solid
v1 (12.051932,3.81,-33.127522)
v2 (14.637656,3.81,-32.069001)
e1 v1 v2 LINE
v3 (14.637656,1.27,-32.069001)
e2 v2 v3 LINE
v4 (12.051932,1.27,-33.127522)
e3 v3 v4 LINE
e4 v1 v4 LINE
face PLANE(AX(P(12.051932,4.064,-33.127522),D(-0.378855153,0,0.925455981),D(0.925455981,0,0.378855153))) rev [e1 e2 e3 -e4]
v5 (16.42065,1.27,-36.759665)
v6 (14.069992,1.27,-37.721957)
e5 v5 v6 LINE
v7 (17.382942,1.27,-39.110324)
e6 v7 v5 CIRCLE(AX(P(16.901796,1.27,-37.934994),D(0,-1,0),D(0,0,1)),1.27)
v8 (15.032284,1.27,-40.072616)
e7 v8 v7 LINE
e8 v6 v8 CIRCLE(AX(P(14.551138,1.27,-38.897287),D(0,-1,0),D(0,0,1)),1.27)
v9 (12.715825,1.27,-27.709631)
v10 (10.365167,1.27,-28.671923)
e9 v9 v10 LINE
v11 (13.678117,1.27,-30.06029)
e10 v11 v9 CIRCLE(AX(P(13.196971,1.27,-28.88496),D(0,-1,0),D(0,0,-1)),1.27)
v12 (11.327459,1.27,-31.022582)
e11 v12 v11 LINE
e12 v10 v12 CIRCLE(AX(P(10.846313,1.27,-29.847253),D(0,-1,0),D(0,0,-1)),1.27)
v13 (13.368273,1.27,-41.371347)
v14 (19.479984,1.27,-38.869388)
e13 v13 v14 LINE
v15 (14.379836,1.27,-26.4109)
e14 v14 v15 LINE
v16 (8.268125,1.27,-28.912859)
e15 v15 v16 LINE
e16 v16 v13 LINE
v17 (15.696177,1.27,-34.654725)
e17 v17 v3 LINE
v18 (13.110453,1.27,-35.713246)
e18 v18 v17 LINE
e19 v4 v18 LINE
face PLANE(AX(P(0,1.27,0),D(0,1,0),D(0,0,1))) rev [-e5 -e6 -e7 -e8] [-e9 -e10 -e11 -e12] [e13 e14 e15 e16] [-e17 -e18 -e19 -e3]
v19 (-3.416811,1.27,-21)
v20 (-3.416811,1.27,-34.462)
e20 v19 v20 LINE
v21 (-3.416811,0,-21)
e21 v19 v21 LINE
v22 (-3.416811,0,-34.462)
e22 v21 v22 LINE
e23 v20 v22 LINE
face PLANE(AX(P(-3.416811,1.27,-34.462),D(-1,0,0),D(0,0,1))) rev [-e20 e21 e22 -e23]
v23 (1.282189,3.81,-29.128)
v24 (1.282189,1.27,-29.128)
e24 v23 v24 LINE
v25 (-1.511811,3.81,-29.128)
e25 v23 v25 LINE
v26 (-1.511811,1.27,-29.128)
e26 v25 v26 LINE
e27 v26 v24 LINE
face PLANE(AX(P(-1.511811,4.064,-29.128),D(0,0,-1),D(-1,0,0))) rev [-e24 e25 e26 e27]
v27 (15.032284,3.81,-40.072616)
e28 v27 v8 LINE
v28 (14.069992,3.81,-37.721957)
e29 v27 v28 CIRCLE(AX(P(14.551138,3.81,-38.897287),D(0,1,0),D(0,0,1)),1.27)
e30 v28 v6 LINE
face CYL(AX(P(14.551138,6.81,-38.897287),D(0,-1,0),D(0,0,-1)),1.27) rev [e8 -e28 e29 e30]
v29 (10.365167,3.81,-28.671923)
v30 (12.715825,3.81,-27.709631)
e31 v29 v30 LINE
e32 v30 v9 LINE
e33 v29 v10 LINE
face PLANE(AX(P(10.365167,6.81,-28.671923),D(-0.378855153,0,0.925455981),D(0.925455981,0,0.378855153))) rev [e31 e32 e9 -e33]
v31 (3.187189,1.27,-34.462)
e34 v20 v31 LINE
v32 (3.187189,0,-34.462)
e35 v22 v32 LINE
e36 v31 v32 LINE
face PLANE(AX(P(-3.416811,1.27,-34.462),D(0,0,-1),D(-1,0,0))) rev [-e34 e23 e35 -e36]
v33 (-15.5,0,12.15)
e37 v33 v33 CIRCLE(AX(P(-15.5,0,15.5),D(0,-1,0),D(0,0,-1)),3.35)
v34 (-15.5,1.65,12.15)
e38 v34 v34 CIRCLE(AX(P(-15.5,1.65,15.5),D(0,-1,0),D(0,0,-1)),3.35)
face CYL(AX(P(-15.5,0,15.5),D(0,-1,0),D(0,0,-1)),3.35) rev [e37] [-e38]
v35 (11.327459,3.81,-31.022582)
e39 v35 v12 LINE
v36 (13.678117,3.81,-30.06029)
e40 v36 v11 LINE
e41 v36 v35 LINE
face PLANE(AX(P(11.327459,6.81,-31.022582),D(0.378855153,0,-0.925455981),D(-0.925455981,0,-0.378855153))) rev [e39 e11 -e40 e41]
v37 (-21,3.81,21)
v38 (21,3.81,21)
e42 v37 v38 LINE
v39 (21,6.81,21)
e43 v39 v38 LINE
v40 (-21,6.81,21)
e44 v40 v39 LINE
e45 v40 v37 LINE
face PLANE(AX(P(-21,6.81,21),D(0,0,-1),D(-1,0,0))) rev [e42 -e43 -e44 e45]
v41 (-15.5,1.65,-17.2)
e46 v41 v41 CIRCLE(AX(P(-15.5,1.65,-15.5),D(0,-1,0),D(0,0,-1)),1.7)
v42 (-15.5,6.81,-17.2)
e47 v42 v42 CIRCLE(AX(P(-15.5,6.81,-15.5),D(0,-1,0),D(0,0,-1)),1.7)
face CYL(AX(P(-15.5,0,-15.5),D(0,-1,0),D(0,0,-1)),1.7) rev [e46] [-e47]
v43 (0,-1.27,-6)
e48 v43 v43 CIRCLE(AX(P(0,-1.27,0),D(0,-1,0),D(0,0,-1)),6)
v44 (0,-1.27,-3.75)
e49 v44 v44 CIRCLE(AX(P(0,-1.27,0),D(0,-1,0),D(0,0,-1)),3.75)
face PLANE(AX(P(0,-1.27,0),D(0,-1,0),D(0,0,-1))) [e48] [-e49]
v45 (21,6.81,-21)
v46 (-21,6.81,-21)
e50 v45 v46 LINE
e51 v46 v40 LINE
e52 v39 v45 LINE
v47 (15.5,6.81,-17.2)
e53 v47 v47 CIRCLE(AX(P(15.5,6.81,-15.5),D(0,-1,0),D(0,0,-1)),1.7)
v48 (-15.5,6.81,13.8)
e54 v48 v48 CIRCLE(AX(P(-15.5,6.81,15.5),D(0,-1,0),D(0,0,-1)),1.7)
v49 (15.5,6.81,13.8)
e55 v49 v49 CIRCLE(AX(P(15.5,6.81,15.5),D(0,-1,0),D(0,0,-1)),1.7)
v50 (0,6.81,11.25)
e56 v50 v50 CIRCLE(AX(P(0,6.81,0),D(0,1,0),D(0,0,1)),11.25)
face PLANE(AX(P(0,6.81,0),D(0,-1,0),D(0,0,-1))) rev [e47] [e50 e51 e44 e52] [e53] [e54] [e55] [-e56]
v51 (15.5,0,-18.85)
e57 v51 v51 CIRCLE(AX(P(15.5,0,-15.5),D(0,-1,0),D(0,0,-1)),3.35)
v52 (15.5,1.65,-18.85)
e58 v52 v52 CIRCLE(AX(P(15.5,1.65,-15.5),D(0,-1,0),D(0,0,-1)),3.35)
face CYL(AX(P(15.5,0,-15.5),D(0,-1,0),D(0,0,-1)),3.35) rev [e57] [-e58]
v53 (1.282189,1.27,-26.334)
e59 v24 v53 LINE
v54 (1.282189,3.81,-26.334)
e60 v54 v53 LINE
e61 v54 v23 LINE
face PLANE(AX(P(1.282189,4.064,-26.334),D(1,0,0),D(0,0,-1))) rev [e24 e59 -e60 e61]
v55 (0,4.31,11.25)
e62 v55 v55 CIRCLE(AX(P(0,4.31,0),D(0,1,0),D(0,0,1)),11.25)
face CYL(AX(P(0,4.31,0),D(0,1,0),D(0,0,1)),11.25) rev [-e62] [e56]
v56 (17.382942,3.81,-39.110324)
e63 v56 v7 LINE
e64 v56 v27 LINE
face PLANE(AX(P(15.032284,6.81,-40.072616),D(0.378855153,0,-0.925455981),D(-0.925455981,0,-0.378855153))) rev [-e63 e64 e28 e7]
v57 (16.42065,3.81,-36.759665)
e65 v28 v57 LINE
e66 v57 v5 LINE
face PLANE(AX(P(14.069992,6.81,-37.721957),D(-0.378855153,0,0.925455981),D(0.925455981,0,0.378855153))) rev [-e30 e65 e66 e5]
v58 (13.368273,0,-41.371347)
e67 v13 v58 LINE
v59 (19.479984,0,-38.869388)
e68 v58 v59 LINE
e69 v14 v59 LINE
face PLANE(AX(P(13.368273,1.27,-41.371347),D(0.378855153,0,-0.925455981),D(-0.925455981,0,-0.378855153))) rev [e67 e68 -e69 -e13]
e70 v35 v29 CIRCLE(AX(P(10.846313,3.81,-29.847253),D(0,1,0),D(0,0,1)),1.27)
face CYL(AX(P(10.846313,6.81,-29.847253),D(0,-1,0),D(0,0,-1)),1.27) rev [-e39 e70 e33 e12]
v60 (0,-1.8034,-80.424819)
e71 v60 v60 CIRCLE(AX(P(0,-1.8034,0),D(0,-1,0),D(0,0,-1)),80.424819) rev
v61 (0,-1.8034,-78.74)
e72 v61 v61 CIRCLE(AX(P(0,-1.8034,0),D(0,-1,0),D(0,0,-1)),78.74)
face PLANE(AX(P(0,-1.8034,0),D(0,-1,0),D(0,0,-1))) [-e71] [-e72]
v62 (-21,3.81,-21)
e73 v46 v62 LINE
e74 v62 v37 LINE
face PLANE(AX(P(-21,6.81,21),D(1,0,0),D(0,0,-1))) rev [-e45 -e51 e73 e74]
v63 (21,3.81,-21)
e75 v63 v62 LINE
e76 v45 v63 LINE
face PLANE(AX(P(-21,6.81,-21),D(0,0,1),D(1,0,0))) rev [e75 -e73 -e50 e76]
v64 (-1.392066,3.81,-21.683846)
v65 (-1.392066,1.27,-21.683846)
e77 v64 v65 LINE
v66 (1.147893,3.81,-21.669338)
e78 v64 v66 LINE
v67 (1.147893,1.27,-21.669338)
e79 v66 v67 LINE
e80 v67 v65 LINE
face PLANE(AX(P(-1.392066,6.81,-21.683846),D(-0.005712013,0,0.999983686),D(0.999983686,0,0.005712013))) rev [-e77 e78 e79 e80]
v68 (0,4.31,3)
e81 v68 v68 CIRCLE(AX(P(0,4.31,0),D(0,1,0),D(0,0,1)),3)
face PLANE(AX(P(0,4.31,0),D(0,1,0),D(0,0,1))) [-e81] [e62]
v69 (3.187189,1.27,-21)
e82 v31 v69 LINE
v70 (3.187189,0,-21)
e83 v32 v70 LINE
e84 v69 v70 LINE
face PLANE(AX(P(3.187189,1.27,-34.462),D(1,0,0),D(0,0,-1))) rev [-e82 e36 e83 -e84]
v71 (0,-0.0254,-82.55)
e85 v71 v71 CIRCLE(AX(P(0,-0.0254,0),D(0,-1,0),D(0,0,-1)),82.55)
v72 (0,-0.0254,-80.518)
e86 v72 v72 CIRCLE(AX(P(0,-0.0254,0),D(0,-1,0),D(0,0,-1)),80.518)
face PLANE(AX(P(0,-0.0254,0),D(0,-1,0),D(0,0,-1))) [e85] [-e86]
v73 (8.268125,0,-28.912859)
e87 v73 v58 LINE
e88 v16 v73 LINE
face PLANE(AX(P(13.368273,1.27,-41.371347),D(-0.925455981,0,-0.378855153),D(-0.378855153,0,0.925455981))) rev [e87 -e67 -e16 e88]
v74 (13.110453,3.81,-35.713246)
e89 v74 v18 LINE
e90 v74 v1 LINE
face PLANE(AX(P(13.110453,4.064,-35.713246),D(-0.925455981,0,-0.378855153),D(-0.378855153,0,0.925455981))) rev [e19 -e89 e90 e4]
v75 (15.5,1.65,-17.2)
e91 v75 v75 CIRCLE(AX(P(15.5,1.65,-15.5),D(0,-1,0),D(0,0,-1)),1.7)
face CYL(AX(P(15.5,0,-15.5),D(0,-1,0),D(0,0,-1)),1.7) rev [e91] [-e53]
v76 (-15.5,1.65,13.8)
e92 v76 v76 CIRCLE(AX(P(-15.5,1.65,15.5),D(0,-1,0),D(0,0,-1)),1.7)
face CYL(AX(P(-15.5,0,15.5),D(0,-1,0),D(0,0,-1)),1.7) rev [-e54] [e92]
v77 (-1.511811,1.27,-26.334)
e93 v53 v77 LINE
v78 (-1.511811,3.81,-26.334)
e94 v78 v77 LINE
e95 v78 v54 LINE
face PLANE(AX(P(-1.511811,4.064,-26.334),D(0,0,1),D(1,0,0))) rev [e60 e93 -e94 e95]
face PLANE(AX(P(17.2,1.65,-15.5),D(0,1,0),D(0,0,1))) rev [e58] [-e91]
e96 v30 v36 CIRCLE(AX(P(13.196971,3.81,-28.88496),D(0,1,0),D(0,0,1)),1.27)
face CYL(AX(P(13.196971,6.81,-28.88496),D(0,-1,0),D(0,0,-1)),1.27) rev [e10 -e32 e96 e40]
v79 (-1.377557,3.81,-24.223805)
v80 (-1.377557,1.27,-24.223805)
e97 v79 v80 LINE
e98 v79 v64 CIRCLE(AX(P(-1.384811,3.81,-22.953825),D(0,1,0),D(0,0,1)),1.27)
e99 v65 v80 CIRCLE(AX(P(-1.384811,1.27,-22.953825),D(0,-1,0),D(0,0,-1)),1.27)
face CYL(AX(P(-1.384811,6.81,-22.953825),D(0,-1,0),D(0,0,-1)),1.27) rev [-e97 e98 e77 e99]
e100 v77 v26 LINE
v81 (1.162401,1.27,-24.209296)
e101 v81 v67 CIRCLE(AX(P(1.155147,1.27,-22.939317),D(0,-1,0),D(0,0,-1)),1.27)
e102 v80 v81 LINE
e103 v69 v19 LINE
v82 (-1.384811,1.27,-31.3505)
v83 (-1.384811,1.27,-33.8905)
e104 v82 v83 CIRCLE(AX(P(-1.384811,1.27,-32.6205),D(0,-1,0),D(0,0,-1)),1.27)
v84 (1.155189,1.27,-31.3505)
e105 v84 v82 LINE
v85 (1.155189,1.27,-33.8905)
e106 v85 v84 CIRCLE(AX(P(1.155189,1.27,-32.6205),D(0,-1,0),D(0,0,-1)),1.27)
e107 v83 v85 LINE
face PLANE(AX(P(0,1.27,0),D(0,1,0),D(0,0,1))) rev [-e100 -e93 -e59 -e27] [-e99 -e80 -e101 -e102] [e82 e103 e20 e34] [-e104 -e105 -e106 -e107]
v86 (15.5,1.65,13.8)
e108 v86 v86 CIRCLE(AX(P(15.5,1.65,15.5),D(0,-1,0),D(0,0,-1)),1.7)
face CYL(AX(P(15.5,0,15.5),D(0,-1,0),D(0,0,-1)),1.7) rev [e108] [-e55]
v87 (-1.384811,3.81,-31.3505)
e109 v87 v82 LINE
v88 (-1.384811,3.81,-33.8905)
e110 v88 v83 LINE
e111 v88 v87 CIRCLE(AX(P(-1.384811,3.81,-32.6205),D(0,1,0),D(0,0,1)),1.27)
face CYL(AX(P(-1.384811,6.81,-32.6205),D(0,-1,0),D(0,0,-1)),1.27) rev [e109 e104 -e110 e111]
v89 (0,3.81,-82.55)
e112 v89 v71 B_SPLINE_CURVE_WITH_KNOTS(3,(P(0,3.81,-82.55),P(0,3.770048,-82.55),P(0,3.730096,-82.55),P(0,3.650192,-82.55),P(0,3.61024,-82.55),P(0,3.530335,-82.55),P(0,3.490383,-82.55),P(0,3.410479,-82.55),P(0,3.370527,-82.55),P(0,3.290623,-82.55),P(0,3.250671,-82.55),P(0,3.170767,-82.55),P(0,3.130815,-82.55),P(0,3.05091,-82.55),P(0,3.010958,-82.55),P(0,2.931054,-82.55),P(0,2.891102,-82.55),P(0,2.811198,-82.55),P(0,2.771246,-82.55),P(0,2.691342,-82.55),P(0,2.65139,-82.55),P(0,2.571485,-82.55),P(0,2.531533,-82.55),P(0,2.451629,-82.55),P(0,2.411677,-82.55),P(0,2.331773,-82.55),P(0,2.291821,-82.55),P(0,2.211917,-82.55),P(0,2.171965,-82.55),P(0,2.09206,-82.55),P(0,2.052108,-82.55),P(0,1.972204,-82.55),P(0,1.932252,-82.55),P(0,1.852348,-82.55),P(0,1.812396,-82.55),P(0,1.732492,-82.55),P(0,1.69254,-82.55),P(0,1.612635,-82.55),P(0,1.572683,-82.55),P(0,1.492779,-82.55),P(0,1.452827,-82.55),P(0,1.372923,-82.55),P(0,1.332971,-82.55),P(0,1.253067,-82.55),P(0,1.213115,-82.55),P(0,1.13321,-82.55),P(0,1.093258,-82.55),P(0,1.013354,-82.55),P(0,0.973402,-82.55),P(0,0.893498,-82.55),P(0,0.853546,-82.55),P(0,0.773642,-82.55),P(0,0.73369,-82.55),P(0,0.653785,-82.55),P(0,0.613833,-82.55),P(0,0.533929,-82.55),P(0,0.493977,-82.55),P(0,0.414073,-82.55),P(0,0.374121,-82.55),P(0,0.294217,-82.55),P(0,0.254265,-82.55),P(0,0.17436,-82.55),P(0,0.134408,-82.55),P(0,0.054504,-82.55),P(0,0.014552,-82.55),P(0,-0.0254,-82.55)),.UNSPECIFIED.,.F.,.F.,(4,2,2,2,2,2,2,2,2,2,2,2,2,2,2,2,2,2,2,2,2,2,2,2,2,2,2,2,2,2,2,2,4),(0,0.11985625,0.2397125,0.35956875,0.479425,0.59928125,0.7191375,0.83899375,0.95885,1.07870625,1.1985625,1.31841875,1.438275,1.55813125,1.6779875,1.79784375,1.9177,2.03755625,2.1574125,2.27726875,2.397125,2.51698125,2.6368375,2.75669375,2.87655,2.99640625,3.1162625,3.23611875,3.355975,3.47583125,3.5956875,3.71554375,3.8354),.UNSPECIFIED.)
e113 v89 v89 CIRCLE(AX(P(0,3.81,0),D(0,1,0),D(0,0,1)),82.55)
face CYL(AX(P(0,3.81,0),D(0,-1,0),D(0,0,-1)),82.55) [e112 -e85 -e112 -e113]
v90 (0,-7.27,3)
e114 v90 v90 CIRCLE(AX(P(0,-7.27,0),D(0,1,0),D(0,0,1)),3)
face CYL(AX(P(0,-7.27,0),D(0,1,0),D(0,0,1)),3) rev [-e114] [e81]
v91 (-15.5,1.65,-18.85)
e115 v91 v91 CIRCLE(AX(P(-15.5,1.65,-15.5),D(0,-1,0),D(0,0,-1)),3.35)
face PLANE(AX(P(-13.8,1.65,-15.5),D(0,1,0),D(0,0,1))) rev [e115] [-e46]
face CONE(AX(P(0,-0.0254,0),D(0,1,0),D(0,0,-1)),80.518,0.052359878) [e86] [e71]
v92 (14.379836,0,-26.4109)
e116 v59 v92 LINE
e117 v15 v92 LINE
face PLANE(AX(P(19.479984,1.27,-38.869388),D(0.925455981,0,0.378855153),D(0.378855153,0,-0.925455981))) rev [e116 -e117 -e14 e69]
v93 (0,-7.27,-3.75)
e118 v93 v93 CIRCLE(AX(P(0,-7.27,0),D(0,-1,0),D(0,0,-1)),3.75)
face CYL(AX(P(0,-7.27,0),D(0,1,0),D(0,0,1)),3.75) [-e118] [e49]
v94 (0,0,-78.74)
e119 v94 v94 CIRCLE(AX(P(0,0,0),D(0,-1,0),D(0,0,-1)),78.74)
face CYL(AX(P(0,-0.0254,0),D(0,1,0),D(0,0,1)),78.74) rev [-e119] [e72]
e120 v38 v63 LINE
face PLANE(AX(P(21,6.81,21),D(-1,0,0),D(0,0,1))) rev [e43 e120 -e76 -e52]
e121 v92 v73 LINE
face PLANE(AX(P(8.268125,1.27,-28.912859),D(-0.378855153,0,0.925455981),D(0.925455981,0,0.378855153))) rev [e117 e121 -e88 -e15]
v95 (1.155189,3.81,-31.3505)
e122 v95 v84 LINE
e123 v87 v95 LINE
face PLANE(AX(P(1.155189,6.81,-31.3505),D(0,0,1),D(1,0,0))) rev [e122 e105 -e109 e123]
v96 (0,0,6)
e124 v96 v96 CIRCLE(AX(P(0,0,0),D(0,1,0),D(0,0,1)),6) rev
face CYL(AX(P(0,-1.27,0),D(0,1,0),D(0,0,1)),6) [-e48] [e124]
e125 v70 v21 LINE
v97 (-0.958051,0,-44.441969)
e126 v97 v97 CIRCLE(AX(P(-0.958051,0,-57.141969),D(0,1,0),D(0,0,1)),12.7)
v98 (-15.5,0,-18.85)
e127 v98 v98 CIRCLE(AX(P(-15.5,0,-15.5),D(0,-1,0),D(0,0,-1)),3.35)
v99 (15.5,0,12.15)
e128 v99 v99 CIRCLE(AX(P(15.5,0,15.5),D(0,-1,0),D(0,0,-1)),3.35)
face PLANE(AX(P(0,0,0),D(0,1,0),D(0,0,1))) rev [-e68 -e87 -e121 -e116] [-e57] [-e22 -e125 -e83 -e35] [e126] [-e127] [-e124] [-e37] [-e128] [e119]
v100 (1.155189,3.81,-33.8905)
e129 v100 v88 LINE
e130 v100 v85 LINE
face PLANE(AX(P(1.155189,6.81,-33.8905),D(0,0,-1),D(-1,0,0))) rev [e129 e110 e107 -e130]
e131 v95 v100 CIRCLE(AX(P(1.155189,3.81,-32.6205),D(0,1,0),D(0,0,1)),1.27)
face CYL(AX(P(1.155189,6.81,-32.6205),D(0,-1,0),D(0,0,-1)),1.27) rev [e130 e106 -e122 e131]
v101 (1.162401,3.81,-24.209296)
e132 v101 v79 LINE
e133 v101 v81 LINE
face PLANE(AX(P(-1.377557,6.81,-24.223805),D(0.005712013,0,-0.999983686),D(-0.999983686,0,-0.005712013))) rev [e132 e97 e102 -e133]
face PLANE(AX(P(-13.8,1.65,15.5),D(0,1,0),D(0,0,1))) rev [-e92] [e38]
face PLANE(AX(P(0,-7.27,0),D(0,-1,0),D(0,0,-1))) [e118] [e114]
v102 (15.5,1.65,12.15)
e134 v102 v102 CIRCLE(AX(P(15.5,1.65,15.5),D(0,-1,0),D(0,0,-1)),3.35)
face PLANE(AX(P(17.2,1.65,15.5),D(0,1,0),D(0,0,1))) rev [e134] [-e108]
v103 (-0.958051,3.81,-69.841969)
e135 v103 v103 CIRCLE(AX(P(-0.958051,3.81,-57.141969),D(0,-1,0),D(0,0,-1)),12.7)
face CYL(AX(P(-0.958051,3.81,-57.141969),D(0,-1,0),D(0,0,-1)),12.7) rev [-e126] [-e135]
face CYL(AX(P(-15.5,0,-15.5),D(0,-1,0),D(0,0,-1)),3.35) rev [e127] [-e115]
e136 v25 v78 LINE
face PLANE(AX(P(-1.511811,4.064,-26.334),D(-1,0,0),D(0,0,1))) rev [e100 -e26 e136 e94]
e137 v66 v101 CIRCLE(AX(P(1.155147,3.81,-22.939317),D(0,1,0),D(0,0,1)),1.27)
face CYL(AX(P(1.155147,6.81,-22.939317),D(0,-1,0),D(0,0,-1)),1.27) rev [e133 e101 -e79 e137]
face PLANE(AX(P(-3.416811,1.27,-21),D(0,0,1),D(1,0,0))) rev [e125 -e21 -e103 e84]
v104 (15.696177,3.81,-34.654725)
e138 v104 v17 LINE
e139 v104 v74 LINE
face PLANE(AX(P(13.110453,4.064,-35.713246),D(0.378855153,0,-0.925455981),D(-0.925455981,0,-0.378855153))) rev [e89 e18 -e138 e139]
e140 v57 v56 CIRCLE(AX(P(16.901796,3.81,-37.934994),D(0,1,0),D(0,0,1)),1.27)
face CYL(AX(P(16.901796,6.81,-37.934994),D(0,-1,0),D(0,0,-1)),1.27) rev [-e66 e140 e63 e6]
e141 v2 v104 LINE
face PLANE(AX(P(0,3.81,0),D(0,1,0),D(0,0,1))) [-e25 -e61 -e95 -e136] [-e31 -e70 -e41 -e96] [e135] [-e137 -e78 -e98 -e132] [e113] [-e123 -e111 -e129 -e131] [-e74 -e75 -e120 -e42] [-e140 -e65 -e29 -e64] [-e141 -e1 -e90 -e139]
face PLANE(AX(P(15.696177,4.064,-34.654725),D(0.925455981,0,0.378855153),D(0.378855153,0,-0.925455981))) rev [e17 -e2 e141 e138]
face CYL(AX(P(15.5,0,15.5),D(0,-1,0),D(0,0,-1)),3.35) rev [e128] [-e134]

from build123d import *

# Parameters (mm, degrees)
SKETCH1_R                       = 82.55
BOSS_EXTRUDE1_DEPTH             = 3.81
HOLE1_OUTLINE_R                 = 12.7
HOLE1_DEPTH                     = 3.81
BOSS_EXTRUDE2_START             = 0.0254
SKETCH3_R                       = 82.55
SKETCH3_R_2                     = 78.74
BOSS_EXTRUDE2_DEPTH             = 0.0254
SKETCH4_R                       = 6
BOSS_EXTRUDE3_DEPTH             = 1.27
SKETCH5_R                       = 3.75
BOSS_EXTRUDE4_DEPTH             = 6
SKETCH7_W                       = 42
SKETCH7_H                       = 42
BOSS_EXTRUDE5_DEPTH             = 3
SKETCH8_R                       = 11.25
CUT_EXTRUDE2_DEPTH              = 2.5
CUT_EXTRUDE1_DEPTH              = 118.267947027
CUT_EXTRUDE1_DEPTH_BACK         = 118.267947027
SKETCH6_R                       = 3
CBORE_FOR_M3_SBHCS1_D           = 3.4
CBORE_FOR_M3_SBHCS1_CBORE_D     = 6.7
CBORE_FOR_M3_SBHCS1_CBORE_DEPTH = 1.65
SKETCH12_W                      = 6.604
SKETCH12_H                      = 13.462
CUT_EXTRUDE3_DEPTH              = 1.27
SKETCH13_W                      = 2.794
SKETCH13_H                      = 2.794
CUT_EXTRUDE4_DEPTH              = 2.794
CUT_EXTRUDE5_DEPTH              = 118.05527156


# Read off the part's stored shape, not the designer's step: Hole1, Lip1
with BuildPart() as part:
    # Sketch1 → Boss-Extrude1 (new body)
    with BuildSketch(Plane(origin=(0, 0, 0), x_dir=(1, 0, 0), z_dir=(0, 1, 0))):
        with Locations(Location((0, 0, 0), (0, 0, 90))):
            Circle(SKETCH1_R)
    extrude(amount=BOSS_EXTRUDE1_DEPTH)

    # Hole1 outline → Hole1 (cut)
    with BuildSketch(Plane(origin=(0, 0, 0), x_dir=(1, 0, 0), z_dir=(0, 1, 0))):
        with Locations((-0.958051057, 57.141969149)):
            Circle(HOLE1_OUTLINE_R)
    extrude(amount=HOLE1_DEPTH, mode=Mode.SUBTRACT)

    # Sketch3 → Boss-Extrude2 (add)
    with BuildSketch(Plane.XZ.offset(BOSS_EXTRUDE2_START)):
        with Locations(Location((0, 0, 0), (0, 0, 270))):
            Circle(SKETCH3_R)
        with Locations(Location((0, 0, 0), (0, 0, 270))):
            Circle(SKETCH3_R_2, mode=Mode.SUBTRACT)
    extrude(amount=-BOSS_EXTRUDE2_DEPTH)

    # Lip1 outline → Lip1 (revolve)
    with BuildSketch(Plane.XY):
        Polygon((78.74, -0.0254), (78.74, -1.8034), (80.424818968, -1.8034), (80.518, -0.0254), align=None)
    revolve(axis=Axis((0, 0, 0), (0, 1, 0)))

    # Sketch4 → Boss-Extrude3 (add)
    with BuildSketch(Plane.XZ):
        with Locations(Location((0, 0, 0), (0, 0, 90))):
            Circle(SKETCH4_R)
    extrude(amount=BOSS_EXTRUDE3_DEPTH)

    # Sketch5 → Boss-Extrude4 (add)
    with BuildSketch(Plane.XZ.offset(1.27)):
        with Locations(Location((0, 0, 0), (0, 0, 270))):
            Circle(SKETCH5_R)
    extrude(amount=BOSS_EXTRUDE4_DEPTH)

    # Sketch7 → Boss-Extrude5 (add)
    with BuildSketch(Plane(origin=(0, 3.81, 0), x_dir=(1, 0, 0), z_dir=(0, 1, 0))):
        Rectangle(SKETCH7_W, SKETCH7_H)
    extrude(amount=BOSS_EXTRUDE5_DEPTH)

    # Sketch8 → Cut-Extrude2 (cut)
    with BuildSketch(Plane(origin=(0, 6.81, 0), x_dir=(1, 0, 0), z_dir=(0, 1, 0))):
        with Locations(Location((0, 0, 0), (0, 0, 270))):
            Circle(SKETCH8_R)
    extrude(amount=-CUT_EXTRUDE2_DEPTH, mode=Mode.SUBTRACT)

    # Sketch6 → Cut-Extrude1 (cut, two sides: drawn at the far end of the back side and taken through both)
    with BuildSketch(Plane(origin=(0, 3.81, 0), x_dir=(1, 0, 0), z_dir=(0, 1, 0)).offset(-CUT_EXTRUDE1_DEPTH_BACK)):
        with Locations(Location((0, 0, 0), (0, 0, 270))):
            Circle(SKETCH6_R)
    extrude(amount=CUT_EXTRUDE1_DEPTH + CUT_EXTRUDE1_DEPTH_BACK, mode=Mode.SUBTRACT)

    # CBORE for M3 SBHCS1 (through all)
    with Locations(Plane(origin=(0, 0, 0), x_dir=(-1, 0, 0), z_dir=(0, -1, 0))):
        with Locations((-15.5, 15.5), (-15.5, -15.5), (15.5, -15.5), (15.5, 15.5)):
            CounterBoreHole(CBORE_FOR_M3_SBHCS1_D / 2, CBORE_FOR_M3_SBHCS1_CBORE_D / 2, CBORE_FOR_M3_SBHCS1_CBORE_DEPTH)

    # Sketch12 → Cut-Extrude3 (cut)
    with BuildSketch(Plane.XZ):
        with Locations((-0.114811482, -27.731)):
            Rectangle(SKETCH12_W, SKETCH12_H)
        Polygon((13.368272935, -41.371347413), (19.479984235, -38.869387984), (14.379836168, -26.410899564), (8.268124867, -28.912858993), align=None)
    extrude(amount=-CUT_EXTRUDE3_DEPTH, mode=Mode.SUBTRACT)

    # Sketch13 → Cut-Extrude4 (cut)
    with BuildSketch(Plane.XZ.offset(-1.27)):
        with Locations((-0.114811482, -27.731)):
            Rectangle(SKETCH13_W, SKETCH13_H)
        Polygon((13.110453194, -35.713246143), (12.051931897, -33.127522131), (14.637655908, -32.069000834), (15.696177205, -34.654724846), align=None)
    extrude(amount=-CUT_EXTRUDE4_DEPTH, mode=Mode.SUBTRACT)

    # Sketch14 → Cut-Extrude5 (cut, through all)
    with BuildSketch(Plane.XZ.offset(-1.27)):
        with BuildLine():
            Line((1.155188518, -33.8905), (-1.384811482, -33.8905))
            ThreePointArc((-1.384811482, -33.8905), (-2.654811482, -32.6205), (-1.384811482, -31.3505))
            Line((-1.384811482, -31.3505), (1.155188518, -31.3505))
            ThreePointArc((1.155188518, -31.3505), (2.425188518, -32.6205), (1.155188518, -33.8905))
        make_face()
        with BuildLine():
            Line((-1.392065738, -21.683846113), (1.147892825, -21.669337601))
            ThreePointArc((1.147892825, -21.669337601), (2.425126363, -22.932062627), (1.162401338, -24.209296164))
            Line((1.162401338, -24.209296164), (-1.377557226, -24.223804677))
            ThreePointArc((-1.377557226, -24.223804677), (-2.654790763, -22.961079651), (-1.392065738, -21.683846113))
        make_face()
        with BuildLine():
            Line((10.365167141, -28.671923416), (12.715825333, -27.709631328))
            ThreePointArc((12.715825333, -27.709631328), (14.372300474, -28.40381438), (13.678117422, -30.06028952))
            Line((13.678117422, -30.06028952), (11.327459229, -31.022581609))
            ThreePointArc((11.327459229, -31.022581609), (9.670984089, -30.328398556), (10.365167141, -28.671923416))
        make_face()
        with BuildLine():
            Line((15.032283769, -40.072615649), (17.382941961, -39.110323561))
            ThreePointArc((17.382941961, -39.110323561), (18.077125013, -37.453848421), (16.420649873, -36.759665368))
            Line((16.420649873, -36.759665368), (14.069991681, -37.721957457))
            ThreePointArc((14.069991681, -37.721957457), (13.375808628, -39.378432597), (15.032283769, -40.072615649))
        make_face()
    extrude(amount=-CUT_EXTRUDE5_DEPTH, mode=Mode.SUBTRACT)


solid = part.part
